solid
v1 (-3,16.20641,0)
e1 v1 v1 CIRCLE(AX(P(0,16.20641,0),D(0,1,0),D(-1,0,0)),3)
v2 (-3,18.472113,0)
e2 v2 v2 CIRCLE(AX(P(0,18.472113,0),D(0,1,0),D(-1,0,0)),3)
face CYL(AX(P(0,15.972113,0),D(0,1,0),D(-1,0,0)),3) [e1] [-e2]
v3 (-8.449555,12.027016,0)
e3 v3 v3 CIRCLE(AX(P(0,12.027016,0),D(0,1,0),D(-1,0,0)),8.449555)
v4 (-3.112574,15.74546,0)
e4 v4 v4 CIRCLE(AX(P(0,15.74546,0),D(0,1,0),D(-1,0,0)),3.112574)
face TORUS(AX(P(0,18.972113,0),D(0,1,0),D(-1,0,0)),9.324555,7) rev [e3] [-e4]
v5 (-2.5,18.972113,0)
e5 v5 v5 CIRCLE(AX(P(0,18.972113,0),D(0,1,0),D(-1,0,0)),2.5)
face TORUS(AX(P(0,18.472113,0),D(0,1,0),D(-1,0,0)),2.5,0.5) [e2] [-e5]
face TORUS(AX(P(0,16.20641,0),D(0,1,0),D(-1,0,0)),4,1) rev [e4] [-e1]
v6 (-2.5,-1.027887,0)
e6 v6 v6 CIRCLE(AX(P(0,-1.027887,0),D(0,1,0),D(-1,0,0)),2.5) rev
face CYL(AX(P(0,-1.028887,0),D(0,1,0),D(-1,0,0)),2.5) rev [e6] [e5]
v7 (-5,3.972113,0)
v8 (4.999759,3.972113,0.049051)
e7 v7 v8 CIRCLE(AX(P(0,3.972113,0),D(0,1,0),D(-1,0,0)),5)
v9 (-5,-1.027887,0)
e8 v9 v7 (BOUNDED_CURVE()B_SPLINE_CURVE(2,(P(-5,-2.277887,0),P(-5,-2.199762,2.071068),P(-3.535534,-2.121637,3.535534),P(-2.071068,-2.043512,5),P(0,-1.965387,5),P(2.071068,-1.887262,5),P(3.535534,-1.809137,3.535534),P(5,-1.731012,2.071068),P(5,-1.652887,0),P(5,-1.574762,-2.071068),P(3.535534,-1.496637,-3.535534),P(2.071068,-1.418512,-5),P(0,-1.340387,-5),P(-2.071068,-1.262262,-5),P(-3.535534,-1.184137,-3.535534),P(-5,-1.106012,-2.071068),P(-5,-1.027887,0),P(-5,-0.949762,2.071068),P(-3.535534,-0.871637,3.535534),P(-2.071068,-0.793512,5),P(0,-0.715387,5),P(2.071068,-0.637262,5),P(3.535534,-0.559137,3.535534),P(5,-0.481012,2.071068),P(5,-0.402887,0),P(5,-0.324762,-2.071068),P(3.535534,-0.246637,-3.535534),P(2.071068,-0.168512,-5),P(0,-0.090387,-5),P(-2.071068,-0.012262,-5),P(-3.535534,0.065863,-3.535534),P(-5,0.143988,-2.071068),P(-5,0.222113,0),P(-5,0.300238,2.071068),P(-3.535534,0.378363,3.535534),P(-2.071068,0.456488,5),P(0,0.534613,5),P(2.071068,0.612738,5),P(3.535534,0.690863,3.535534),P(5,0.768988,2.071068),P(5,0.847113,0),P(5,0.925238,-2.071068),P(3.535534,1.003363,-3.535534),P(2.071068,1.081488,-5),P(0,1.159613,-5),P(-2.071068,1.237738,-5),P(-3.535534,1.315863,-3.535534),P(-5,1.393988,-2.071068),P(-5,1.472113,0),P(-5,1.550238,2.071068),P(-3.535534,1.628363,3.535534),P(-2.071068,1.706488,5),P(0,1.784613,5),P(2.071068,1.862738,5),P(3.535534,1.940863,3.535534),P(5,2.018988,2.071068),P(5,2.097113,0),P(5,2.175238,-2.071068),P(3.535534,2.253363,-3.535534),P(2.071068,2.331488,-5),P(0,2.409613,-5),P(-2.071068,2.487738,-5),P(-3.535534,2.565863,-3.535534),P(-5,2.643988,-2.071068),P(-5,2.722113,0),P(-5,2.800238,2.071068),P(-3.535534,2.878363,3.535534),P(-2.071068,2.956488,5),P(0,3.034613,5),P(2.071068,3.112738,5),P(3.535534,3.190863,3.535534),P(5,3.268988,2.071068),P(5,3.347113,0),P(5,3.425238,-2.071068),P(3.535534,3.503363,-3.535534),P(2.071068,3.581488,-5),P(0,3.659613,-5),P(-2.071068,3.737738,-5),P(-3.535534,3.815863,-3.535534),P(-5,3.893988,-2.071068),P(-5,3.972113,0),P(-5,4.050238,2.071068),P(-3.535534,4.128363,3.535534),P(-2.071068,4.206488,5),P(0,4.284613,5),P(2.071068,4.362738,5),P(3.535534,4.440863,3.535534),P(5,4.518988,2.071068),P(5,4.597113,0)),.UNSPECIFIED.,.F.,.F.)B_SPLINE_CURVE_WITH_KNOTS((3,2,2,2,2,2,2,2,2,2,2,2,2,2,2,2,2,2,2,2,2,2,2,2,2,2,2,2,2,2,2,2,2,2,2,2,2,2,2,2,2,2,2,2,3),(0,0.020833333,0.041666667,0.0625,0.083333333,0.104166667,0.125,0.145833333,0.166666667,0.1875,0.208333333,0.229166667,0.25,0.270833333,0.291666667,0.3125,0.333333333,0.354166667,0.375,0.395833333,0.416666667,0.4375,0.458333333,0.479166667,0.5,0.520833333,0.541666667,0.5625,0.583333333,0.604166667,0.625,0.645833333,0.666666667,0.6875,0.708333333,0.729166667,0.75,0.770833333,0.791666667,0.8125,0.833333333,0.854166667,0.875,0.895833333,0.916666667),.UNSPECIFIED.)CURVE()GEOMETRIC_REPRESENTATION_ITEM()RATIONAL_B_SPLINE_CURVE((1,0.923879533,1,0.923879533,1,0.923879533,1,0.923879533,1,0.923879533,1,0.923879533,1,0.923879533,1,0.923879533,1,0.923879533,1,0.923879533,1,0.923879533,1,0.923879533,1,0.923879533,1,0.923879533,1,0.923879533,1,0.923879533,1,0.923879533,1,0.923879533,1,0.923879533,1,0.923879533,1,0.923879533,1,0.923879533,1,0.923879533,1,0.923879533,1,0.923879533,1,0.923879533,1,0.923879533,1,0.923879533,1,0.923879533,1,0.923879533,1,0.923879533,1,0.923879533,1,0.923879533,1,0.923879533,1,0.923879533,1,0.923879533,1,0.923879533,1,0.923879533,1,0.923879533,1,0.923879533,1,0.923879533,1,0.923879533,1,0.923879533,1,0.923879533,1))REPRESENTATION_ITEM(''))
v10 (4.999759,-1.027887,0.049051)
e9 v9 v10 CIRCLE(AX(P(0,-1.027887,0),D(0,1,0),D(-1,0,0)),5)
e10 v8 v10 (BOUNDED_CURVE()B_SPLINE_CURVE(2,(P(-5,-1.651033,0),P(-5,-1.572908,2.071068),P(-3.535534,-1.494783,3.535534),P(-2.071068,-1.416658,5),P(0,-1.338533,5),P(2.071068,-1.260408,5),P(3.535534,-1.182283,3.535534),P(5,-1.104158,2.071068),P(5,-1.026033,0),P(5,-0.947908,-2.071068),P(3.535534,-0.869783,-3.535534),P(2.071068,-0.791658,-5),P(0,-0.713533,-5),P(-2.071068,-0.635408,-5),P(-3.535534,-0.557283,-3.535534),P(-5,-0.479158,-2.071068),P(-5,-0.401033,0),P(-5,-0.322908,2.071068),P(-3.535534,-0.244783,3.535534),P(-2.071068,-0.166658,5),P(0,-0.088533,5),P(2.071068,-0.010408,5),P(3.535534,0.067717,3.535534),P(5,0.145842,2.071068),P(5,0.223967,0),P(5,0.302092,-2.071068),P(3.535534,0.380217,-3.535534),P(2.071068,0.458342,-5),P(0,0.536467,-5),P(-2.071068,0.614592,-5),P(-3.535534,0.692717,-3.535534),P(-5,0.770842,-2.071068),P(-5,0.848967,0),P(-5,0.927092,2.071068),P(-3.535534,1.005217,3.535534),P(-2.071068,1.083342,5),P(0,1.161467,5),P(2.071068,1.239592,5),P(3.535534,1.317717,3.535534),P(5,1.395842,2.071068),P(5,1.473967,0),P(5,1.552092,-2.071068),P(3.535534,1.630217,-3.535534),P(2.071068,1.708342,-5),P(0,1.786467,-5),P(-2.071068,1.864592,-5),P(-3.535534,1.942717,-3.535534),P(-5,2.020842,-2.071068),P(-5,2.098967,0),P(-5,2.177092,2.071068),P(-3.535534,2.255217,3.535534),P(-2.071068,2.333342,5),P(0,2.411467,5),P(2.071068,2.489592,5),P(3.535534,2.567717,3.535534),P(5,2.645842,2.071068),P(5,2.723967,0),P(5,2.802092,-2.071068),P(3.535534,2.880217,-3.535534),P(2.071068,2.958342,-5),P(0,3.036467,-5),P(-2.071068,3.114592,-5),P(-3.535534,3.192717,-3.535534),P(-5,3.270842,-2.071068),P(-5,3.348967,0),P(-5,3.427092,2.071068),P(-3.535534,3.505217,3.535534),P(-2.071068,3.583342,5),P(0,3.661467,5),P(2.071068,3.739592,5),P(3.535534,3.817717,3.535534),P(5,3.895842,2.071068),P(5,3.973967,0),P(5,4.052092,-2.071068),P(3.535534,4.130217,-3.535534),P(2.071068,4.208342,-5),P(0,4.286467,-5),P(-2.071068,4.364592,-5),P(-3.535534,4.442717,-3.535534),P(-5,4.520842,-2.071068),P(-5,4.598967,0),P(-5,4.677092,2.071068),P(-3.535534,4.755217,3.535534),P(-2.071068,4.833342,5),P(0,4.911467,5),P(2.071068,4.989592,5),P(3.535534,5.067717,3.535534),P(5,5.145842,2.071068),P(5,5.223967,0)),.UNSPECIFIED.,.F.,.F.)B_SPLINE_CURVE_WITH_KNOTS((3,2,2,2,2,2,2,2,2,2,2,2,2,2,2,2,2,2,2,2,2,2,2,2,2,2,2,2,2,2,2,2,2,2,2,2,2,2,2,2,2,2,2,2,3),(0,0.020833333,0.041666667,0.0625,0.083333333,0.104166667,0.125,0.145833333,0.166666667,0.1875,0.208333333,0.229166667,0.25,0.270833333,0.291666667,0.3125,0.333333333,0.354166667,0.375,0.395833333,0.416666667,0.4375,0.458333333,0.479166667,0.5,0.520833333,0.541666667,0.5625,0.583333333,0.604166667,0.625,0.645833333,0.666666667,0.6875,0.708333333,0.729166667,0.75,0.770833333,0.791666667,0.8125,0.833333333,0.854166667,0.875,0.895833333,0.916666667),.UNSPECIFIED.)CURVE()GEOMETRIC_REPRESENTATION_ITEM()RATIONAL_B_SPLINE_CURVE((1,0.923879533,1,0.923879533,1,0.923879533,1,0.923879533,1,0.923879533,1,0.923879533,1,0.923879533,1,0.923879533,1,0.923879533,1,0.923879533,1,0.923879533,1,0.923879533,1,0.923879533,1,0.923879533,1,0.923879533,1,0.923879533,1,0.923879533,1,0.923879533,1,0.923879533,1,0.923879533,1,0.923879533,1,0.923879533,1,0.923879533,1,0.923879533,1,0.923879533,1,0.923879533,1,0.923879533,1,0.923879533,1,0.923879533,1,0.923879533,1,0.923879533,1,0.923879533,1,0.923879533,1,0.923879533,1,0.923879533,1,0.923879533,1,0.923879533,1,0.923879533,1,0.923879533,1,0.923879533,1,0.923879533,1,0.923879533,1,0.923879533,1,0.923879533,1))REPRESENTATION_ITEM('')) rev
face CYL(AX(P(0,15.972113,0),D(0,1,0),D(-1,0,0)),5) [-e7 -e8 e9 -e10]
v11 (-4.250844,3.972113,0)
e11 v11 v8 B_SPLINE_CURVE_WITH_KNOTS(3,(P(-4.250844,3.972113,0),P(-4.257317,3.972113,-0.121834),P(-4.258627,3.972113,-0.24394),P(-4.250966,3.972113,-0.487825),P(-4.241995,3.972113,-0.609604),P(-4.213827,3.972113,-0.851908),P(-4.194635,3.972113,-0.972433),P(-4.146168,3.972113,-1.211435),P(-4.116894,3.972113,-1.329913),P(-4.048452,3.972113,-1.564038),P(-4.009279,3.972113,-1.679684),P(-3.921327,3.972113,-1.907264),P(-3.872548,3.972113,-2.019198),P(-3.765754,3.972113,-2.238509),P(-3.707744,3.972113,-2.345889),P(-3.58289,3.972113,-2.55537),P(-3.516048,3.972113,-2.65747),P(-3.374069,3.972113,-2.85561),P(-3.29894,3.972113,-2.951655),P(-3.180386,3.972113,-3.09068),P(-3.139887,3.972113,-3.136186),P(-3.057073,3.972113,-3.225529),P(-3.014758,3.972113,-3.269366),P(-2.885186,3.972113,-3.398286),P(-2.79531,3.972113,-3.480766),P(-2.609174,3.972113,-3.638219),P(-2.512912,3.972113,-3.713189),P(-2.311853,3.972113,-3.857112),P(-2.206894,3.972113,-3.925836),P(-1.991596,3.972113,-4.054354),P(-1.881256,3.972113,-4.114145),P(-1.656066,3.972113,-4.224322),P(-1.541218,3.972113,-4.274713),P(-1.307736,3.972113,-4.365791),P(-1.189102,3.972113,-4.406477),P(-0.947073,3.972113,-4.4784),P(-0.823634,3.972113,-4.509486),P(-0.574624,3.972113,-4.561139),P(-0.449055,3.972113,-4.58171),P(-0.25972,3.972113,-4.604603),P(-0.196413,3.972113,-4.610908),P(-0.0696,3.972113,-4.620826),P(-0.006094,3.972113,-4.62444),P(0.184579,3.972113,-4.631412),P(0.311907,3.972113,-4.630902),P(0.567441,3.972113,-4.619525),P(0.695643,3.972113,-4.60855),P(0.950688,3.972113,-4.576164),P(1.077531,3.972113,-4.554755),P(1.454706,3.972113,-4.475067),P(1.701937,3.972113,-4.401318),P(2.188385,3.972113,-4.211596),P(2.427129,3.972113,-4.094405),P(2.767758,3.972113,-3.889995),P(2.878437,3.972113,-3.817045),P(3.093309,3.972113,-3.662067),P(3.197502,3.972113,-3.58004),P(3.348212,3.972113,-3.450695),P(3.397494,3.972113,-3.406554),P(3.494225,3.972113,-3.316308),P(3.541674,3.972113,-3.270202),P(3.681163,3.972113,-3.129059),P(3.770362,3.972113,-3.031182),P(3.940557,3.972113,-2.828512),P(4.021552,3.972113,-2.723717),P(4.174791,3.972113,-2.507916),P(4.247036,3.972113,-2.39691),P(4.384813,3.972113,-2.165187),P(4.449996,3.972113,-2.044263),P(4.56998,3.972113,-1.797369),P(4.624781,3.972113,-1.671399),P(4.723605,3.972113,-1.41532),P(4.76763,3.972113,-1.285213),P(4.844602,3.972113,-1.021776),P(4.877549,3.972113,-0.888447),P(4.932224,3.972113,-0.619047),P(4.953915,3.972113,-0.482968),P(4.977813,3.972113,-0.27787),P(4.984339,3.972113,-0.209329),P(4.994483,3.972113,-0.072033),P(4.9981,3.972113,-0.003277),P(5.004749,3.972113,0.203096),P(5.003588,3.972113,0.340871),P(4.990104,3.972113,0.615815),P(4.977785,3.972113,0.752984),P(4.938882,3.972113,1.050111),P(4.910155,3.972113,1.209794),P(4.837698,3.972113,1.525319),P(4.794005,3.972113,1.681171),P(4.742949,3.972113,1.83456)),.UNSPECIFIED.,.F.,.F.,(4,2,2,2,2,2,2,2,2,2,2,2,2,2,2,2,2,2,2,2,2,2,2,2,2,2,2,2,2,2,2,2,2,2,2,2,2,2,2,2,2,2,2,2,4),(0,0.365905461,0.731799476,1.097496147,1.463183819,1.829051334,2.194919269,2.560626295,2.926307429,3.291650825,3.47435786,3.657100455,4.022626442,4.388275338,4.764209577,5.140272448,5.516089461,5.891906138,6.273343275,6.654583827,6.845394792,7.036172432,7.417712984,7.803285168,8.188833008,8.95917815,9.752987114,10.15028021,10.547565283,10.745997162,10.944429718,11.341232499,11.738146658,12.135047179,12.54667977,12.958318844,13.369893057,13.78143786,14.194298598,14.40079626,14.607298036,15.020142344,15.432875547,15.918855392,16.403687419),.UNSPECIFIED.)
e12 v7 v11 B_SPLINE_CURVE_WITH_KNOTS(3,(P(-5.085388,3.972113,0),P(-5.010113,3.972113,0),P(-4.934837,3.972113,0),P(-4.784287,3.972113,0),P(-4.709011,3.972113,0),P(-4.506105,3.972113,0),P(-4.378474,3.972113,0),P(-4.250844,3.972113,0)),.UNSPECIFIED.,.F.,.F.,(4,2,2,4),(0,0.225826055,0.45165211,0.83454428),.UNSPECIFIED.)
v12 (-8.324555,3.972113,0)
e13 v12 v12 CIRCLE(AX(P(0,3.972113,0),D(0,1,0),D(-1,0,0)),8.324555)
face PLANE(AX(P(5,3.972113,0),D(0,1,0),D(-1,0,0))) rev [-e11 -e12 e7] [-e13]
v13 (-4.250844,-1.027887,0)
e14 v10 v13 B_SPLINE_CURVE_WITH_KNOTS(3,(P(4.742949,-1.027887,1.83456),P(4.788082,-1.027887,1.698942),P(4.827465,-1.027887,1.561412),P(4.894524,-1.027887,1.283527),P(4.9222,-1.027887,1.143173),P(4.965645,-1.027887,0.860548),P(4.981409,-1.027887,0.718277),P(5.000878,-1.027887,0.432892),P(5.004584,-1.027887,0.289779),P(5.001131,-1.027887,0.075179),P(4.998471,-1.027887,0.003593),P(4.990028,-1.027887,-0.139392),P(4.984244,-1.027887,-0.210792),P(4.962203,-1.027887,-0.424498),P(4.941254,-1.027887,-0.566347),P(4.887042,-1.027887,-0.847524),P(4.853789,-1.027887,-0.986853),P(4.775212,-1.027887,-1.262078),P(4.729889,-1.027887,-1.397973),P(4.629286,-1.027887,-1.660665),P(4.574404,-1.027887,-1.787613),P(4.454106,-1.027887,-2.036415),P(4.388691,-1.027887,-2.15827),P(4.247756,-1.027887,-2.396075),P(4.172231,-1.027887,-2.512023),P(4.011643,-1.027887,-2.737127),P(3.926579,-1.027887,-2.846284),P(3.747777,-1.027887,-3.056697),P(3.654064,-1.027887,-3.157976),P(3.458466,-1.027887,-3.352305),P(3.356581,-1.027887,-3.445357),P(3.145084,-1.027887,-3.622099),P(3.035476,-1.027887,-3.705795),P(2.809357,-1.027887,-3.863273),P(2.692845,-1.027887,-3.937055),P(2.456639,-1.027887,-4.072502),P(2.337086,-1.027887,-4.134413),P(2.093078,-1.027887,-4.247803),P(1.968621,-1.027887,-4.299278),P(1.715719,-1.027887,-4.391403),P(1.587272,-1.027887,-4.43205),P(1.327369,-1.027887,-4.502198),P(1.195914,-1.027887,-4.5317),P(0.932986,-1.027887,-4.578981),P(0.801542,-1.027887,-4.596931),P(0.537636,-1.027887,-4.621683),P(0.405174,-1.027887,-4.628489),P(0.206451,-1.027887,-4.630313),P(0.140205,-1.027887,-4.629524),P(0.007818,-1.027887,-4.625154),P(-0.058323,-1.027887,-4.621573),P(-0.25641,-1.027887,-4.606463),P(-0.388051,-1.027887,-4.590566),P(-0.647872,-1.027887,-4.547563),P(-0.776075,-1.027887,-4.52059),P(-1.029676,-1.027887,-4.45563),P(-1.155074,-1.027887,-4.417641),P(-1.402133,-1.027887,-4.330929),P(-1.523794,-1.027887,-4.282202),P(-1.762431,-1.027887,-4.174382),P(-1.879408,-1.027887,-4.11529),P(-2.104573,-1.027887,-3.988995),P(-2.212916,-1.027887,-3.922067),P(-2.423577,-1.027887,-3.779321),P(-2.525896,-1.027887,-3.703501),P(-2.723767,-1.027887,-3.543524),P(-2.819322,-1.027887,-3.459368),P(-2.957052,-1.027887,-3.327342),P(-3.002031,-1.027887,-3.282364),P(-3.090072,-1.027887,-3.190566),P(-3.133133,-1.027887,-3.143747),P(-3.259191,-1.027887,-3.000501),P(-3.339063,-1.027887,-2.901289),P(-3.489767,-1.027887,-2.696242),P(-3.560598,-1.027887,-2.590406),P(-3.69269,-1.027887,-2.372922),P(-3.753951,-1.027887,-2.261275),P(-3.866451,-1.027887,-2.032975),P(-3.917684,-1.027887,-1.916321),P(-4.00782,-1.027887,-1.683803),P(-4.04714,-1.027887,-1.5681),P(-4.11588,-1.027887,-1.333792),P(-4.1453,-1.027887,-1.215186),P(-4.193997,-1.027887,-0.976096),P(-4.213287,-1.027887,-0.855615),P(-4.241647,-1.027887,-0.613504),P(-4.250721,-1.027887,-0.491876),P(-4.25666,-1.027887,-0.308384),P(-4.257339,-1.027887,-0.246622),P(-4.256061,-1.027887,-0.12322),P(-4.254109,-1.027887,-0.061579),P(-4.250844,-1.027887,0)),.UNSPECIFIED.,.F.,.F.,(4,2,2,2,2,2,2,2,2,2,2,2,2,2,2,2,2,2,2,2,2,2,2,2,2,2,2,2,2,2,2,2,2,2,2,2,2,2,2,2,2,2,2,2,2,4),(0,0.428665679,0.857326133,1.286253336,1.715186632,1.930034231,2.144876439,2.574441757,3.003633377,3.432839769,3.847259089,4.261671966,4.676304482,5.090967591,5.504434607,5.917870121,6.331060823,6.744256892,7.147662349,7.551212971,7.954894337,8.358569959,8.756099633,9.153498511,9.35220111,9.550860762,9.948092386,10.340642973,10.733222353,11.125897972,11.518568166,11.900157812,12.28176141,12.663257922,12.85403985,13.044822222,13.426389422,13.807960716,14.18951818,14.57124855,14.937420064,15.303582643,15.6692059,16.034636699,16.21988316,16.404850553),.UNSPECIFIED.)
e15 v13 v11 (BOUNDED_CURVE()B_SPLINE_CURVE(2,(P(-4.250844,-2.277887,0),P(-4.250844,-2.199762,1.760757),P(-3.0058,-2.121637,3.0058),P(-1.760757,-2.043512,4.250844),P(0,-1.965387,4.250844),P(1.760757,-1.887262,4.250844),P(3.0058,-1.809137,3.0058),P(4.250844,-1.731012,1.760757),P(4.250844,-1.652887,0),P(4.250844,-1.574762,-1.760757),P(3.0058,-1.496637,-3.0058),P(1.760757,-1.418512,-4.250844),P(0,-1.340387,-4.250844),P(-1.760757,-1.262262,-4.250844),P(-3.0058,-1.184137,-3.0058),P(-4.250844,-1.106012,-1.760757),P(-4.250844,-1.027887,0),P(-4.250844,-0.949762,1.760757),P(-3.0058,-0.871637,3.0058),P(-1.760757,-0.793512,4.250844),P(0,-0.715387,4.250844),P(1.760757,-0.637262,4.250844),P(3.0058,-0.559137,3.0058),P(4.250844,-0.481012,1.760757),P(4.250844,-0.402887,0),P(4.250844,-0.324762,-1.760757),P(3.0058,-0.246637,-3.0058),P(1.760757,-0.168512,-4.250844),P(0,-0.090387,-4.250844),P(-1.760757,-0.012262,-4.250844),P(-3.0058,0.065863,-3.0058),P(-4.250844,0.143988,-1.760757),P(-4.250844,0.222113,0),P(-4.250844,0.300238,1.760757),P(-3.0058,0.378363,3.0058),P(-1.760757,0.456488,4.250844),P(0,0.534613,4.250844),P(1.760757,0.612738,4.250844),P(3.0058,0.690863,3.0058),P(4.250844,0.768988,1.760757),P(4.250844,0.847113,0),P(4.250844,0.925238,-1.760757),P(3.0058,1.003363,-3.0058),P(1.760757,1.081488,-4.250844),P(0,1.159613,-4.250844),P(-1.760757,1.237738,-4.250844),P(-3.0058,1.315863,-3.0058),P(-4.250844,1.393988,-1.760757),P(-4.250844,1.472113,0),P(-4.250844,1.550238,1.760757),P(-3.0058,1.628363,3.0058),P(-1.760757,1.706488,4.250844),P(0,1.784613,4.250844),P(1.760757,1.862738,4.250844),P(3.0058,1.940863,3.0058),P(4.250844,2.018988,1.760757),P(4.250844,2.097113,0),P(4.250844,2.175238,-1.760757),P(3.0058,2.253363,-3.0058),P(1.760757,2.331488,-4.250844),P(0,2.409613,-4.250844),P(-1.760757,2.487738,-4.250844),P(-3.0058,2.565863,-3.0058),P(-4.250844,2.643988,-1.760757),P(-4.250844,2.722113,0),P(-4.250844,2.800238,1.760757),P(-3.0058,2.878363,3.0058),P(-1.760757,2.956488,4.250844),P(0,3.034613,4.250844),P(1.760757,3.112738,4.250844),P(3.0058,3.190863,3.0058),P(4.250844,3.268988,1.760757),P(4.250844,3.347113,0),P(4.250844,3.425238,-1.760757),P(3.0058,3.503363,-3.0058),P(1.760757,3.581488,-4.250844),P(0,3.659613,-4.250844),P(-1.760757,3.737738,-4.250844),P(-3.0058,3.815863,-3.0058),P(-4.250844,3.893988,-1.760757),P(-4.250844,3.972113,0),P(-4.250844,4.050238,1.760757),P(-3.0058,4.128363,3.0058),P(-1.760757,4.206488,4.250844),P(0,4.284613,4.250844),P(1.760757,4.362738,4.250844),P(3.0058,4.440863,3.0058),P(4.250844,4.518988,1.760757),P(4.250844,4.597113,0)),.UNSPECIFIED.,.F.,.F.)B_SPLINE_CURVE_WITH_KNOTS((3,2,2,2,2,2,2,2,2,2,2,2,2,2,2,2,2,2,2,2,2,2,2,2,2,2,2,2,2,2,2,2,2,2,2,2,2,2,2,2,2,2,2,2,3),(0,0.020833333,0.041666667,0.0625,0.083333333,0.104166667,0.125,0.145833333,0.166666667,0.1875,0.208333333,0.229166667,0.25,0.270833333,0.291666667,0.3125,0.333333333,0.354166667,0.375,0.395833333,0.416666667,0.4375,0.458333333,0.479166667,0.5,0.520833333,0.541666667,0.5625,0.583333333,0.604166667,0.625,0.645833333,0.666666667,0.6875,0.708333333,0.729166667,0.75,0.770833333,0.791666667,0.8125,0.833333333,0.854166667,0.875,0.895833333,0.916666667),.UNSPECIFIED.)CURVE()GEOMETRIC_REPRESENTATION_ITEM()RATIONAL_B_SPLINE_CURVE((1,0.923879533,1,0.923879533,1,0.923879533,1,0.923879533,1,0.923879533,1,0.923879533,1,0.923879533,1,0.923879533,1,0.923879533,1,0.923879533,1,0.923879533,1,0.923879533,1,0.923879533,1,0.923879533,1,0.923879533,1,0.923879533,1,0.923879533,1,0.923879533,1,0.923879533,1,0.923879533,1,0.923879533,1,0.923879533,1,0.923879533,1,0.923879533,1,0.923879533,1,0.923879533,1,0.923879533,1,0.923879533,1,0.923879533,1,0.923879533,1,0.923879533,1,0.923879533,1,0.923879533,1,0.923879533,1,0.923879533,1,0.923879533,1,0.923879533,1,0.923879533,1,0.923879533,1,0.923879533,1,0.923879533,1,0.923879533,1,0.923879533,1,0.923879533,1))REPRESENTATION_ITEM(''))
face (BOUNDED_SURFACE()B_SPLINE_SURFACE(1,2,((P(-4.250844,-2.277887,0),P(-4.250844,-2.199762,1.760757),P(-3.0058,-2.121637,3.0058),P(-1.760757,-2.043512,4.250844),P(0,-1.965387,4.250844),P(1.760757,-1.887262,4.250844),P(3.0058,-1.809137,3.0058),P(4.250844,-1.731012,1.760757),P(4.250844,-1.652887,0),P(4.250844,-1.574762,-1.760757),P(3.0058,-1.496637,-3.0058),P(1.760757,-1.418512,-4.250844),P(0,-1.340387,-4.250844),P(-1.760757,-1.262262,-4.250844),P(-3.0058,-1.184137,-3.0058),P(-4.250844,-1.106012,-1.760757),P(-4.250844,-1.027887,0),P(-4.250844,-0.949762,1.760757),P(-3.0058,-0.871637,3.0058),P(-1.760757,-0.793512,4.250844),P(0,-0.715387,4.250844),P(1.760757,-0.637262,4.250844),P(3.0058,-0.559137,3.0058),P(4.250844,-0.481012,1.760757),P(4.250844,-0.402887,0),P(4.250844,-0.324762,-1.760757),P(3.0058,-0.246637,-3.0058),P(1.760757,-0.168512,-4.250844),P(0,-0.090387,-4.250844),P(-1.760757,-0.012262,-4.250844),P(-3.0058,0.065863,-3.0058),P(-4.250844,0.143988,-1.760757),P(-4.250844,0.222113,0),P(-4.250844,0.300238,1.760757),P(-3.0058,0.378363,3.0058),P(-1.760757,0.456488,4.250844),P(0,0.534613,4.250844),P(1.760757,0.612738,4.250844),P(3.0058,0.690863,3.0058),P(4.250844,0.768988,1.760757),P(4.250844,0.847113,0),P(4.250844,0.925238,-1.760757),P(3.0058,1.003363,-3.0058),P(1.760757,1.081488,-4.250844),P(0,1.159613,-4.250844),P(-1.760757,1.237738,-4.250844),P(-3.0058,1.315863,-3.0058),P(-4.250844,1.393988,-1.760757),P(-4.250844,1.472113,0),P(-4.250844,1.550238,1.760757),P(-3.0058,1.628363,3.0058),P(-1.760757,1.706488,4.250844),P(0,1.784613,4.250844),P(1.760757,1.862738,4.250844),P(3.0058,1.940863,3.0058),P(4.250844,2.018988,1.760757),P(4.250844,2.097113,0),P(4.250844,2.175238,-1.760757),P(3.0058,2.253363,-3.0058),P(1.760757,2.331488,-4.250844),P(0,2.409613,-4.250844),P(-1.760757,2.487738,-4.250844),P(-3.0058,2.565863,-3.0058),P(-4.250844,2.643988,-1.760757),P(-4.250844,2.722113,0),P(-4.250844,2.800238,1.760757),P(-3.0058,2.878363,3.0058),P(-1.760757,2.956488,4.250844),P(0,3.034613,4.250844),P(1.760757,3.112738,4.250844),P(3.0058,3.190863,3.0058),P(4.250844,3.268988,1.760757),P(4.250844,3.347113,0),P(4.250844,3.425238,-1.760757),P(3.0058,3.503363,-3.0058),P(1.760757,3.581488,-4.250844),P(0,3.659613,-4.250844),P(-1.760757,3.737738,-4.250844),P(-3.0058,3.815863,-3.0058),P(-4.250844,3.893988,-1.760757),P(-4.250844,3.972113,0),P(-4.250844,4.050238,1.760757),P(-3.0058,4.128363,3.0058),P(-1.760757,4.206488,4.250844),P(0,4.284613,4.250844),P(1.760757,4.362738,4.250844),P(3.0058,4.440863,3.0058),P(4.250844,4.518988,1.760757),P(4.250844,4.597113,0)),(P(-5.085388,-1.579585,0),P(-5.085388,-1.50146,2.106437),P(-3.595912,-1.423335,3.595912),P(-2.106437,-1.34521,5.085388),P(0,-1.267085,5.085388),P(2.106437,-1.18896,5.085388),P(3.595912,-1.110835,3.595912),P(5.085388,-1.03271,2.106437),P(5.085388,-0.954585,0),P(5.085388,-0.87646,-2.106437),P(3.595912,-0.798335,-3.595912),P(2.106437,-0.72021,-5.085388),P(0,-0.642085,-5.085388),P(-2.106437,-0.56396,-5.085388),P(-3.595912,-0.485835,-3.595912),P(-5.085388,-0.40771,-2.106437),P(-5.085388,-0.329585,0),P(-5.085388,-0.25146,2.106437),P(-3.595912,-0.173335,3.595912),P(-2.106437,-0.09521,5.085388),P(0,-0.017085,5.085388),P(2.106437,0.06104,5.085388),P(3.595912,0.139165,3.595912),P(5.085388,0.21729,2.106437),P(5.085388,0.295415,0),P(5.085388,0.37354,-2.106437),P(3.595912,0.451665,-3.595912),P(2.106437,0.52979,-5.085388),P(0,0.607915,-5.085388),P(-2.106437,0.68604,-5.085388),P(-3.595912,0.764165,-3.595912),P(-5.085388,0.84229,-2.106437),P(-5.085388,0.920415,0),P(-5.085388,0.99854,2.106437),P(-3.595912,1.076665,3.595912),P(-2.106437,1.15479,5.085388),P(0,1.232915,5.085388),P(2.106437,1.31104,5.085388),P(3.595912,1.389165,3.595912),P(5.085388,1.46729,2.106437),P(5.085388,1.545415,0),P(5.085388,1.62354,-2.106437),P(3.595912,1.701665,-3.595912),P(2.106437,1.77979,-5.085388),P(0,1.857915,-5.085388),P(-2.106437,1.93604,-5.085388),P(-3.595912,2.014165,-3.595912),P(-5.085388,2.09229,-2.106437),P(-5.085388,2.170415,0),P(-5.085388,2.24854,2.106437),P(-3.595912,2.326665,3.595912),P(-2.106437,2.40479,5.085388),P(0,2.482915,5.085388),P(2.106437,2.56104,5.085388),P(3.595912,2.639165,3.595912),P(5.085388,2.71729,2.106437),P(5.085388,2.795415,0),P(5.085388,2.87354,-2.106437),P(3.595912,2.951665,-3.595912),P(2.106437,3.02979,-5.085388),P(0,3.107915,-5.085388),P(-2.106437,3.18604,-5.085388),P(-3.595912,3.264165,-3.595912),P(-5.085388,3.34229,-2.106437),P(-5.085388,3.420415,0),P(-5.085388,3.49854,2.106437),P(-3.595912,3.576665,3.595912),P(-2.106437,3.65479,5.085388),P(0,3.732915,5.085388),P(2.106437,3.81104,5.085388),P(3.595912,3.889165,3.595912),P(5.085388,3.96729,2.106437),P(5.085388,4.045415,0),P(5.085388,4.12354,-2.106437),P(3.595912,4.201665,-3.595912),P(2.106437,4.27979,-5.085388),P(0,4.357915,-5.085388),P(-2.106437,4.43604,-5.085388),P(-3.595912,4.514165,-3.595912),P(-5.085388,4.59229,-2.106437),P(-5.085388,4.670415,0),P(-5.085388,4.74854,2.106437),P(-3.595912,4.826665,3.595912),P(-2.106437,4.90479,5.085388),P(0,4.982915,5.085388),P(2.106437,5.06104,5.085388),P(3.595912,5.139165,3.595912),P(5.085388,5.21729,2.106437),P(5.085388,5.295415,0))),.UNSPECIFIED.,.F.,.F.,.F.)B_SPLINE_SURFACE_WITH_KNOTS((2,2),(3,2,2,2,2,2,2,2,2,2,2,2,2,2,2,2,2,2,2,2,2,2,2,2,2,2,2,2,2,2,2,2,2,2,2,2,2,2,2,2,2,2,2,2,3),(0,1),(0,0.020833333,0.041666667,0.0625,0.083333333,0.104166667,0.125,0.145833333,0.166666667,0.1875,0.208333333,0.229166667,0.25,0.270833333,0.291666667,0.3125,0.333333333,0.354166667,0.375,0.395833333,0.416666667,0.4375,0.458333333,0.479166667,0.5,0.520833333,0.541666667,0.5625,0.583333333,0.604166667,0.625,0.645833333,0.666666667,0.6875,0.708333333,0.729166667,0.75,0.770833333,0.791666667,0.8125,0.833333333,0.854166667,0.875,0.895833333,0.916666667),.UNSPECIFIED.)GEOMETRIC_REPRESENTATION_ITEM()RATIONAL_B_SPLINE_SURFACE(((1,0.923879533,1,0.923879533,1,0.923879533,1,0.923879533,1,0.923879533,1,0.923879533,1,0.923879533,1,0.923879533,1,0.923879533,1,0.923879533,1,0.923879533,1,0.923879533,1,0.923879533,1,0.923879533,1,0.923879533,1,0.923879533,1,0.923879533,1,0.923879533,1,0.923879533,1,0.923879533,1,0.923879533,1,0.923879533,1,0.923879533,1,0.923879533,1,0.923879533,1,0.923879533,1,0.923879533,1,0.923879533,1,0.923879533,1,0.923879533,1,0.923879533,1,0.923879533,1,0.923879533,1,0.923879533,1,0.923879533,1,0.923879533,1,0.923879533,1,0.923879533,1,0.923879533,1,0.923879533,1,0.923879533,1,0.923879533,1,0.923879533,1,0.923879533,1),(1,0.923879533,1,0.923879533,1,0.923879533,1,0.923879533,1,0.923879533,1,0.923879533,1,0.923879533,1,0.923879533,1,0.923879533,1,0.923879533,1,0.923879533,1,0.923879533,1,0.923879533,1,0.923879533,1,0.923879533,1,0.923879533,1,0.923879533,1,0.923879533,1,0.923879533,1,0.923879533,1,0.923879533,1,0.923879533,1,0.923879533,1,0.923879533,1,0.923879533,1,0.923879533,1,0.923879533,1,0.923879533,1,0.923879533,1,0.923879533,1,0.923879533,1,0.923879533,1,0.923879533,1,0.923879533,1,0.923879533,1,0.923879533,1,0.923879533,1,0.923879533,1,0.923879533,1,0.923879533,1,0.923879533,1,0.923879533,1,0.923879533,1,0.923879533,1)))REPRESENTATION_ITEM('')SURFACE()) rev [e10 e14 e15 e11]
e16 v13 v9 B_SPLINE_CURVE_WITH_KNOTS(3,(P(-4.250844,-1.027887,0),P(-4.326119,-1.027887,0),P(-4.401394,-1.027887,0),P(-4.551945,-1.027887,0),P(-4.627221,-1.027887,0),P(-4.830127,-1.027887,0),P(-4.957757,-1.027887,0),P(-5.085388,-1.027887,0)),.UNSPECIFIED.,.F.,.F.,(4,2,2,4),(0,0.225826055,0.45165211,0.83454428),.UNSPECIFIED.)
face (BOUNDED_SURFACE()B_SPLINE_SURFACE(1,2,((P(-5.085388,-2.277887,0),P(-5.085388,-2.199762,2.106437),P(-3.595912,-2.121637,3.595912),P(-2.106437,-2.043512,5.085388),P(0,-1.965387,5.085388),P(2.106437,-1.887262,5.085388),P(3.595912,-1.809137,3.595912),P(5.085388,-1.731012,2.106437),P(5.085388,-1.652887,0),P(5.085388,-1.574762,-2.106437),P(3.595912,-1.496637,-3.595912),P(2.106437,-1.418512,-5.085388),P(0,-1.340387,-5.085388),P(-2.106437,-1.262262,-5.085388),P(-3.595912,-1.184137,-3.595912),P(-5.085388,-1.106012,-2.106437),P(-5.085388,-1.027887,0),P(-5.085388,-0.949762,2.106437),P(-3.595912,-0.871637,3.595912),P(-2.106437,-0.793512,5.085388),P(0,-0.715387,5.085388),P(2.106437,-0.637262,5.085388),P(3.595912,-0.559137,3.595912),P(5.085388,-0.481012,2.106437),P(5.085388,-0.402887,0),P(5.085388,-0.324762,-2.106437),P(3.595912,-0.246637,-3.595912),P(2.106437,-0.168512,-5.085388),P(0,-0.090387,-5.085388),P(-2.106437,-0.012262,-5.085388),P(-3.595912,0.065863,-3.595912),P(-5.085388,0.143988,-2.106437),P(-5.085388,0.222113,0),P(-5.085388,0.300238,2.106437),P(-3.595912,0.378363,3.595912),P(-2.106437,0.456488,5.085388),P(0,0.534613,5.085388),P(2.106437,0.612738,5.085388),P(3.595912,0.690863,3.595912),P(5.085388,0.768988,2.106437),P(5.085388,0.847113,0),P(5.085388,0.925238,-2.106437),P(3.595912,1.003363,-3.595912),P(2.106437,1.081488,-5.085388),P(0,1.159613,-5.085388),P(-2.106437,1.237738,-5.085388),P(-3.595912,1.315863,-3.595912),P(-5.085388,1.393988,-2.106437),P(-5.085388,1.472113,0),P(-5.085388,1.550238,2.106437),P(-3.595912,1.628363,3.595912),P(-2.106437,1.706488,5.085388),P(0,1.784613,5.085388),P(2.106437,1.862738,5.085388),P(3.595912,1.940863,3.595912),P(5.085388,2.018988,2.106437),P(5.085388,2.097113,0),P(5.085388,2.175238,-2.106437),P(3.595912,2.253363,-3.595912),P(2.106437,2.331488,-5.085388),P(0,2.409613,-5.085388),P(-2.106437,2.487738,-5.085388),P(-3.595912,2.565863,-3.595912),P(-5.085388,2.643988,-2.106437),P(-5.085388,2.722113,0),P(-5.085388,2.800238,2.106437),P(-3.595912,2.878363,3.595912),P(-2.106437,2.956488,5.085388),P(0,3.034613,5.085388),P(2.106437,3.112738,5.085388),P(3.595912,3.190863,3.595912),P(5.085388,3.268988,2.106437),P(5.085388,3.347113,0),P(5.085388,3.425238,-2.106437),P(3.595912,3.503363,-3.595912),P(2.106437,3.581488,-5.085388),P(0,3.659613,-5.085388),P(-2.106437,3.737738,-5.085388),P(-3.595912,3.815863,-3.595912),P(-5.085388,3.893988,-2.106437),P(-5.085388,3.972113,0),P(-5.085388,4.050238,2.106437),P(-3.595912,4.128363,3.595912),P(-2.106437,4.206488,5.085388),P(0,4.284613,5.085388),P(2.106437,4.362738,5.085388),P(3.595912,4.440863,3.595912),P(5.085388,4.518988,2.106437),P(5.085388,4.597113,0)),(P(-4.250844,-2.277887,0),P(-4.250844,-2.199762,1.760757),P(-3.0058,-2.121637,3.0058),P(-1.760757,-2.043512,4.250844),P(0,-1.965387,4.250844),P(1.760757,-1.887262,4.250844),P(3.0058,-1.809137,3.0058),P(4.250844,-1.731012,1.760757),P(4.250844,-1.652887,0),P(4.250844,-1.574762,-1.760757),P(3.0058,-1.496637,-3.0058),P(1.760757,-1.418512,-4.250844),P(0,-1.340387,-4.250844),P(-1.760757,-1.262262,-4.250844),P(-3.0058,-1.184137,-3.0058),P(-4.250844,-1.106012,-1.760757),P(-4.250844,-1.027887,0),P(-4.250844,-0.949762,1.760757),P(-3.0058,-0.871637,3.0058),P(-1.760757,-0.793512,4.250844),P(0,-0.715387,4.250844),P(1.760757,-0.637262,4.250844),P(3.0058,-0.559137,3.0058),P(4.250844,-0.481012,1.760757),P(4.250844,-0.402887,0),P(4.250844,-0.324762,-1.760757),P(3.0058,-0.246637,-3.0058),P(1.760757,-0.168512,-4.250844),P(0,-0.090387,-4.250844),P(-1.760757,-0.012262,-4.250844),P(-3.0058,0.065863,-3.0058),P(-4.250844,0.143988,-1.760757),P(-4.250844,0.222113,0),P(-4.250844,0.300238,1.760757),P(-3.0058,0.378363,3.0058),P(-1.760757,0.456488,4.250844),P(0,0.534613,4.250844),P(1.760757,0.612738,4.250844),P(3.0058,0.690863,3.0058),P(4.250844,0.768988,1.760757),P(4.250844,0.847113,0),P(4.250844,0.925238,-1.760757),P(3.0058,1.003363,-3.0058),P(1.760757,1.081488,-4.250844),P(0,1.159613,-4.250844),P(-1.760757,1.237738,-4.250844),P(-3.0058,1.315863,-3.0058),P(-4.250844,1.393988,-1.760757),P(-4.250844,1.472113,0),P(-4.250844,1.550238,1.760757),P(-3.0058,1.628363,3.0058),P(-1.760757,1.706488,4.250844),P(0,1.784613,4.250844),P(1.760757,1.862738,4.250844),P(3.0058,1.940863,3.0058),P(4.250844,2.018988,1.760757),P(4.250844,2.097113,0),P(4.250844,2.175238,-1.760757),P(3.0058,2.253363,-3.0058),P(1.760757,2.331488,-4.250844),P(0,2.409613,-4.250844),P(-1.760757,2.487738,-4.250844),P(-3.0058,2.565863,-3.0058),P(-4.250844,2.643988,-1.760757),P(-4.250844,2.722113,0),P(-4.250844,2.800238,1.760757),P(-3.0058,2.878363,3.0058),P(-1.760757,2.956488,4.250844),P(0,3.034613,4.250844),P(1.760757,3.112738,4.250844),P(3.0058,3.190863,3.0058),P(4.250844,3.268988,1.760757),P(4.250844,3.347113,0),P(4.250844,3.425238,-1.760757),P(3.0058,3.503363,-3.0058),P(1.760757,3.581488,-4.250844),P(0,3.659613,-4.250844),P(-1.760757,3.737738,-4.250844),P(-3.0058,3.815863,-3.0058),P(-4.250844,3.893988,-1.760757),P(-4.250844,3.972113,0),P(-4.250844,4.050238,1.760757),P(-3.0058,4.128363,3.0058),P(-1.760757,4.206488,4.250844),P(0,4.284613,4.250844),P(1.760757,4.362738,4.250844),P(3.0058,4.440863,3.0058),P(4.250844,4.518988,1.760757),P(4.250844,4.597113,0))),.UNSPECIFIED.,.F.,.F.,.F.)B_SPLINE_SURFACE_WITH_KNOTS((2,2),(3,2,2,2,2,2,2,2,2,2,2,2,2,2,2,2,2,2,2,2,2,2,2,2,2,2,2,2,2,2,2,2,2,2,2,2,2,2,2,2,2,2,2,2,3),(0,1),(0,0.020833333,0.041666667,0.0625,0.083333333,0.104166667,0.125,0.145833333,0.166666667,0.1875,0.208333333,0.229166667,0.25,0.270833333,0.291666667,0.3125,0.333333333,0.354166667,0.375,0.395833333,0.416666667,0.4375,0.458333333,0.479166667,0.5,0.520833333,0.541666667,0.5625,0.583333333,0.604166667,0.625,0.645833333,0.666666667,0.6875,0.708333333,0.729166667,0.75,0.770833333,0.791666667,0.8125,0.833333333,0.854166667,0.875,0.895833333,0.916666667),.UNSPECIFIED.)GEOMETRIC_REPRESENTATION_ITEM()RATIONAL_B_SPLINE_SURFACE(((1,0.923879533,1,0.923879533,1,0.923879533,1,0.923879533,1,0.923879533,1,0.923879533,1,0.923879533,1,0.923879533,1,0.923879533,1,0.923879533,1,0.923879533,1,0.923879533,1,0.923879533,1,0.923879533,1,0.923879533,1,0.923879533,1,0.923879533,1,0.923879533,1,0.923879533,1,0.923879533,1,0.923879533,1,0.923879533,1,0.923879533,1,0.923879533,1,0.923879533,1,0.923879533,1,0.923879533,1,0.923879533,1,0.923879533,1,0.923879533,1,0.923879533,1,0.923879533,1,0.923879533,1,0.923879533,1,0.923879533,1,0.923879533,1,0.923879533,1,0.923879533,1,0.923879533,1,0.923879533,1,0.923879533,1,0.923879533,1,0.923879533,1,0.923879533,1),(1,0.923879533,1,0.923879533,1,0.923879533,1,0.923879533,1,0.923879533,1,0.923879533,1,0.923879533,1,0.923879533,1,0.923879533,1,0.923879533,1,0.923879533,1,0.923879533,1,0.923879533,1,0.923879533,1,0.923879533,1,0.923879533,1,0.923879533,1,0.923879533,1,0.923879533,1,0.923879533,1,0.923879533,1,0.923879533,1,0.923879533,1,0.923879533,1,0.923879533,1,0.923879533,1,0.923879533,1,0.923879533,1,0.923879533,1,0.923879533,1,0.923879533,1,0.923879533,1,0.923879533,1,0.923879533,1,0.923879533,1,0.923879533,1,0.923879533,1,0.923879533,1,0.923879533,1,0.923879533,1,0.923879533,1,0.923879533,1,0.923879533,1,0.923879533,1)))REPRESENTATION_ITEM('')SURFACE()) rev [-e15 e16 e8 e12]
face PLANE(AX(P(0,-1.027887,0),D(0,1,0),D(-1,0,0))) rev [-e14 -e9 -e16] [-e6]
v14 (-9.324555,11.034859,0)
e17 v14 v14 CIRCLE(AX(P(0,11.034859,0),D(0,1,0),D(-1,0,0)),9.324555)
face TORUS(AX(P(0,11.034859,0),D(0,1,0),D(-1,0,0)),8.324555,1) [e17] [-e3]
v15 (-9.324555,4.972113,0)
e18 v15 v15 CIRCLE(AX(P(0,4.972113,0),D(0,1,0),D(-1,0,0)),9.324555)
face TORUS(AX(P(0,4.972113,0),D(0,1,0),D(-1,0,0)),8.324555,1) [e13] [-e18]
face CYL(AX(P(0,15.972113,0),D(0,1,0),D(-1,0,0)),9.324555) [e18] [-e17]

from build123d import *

# Parameters (mm, degrees)
KES_EKSTR_ZYON1_REACH = 25.956
IZIM2_R               = 2.5
KES_S_P_R1_PITCH      = 1.25
KES_S_P_R1_TO         = 5


with BuildPart() as part:
    # Çizim1 → Döndür1 (revolve)
    with BuildSketch(Plane.XY, mode=Mode.PRIVATE) as d_nd_r1_sk:
        with BuildLine():
            Line((0, -1.027887155), (5, -1.027887155))
            Line((5, -1.027887155), (5, 3.972112845))
            Line((5, 3.972112845), (8.32455532, 3.972112845))
            ThreePointArc((8.32455532, 3.972112845), (9.031662102, 4.265006064), (9.32455532, 4.972112845))
            Line((9.32455532, 4.972112845), (9.32455532, 11.034858912))
            ThreePointArc((9.32455532, 11.034858912), (9.07455532, 11.69629674), (8.44955532, 12.027015654))
            ThreePointArc((8.44955532, 12.027015654), (5.322926591, 13.228684643), (3.112574113, 15.745459861))
            ThreePointArc((3.112574113, 15.745459861), (3.028551111, 15.969161353), (3, 16.206410287))
            Line((3, 16.206410287), (3, 18.472112845))
            ThreePointArc((3, 18.472112845), (2.853553391, 18.825666236), (2.5, 18.972112845))
            Line((2.5, 18.972112845), (0, 18.972112845))
            Line((0, 18.972112845), (0, 15.972112845))
            Line((0, 15.972112845), (0, -1.027887155))
        make_face()
    revolve(d_nd_r1_sk.sketch.rotate(Axis((0, 15.972112845, 0), (0, -1, 0)), 180), axis=Axis((0, 15.972112845, 0), (0, -1, 0)))

    # Çizim2 → Kes-Ekstrüzyon1 (cut, up to next)
    with BuildSketch(Plane(origin=(0, 18.972112845, 0), x_dir=(1, 0, 0), z_dir=(0, 1, 0)), mode=Mode.PRIVATE) as kes_ekstr_zyon1_sk1:
        with Locations(Location((0, 0, 0), (0, 0, 180))):
            Circle(IZIM2_R)
    kes_ekstr_zyon1_tool1 = extrude(kes_ekstr_zyon1_sk1.sketch, amount=-KES_EKSTR_ZYON1_REACH, mode=Mode.PRIVATE) & part.part
    add(kes_ekstr_zyon1_tool1.solids().sort_by_distance((0, 18.972113, 0))[0], mode=Mode.SUBTRACT)

    # Kes-Süpür1: arcs per turn and ends read off the stored shape
    # Kes-Süpür1: the profile of Çizim7 screwed along a right-hand helix through 5.5 turns, 8 arcs to a turn; built about Z, then put on its axis
    kes_s_p_r1_z = Axis((0, 0, 0), (0, 0, 1))
    kes_s_p_r1_corners = [(4.250843742, 0, -1.25), (5.085388022, 0, -0.551697778), (5.085388022, 0, -1.25)]
    with BuildLine(mode=Mode.PRIVATE) as kes_s_p_r1_profile:
        Line(kes_s_p_r1_corners[0], kes_s_p_r1_corners[1])
        Line(kes_s_p_r1_corners[1], kes_s_p_r1_corners[2])
        Line(kes_s_p_r1_corners[2], kes_s_p_r1_corners[0])
    kes_s_p_r1_cap = Face(kes_s_p_r1_profile.wire())
    kes_s_p_r1_turn_angles = [0, 22.5, 45, 67.5, 90, 112.5, 135, 157.5, 180, 202.5, 225, 247.5, 270, 292.5, 315, 337.5, 360]
    kes_s_p_r1_turn_weights = [1, 0.9238795325112867, 1, 0.9238795325112867, 1, 0.9238795325112867, 1, 0.9238795325112867, 1, 0.9238795325112867, 1, 0.9238795325112867, 1, 0.9238795325112867, 1, 0.9238795325112867, 1]
    kes_s_p_r1_turn_rails = [Edge.make_bspline([Vector(p[0], p[1], 0).rotate(kes_s_p_r1_z, kes_s_p_r1_turn_angles[k]) / kes_s_p_r1_turn_weights[k] + Vector(0, 0, p[2] + KES_S_P_R1_PITCH * kes_s_p_r1_turn_angles[k] / 360) for k in range(17)], [0, 0, 0, 1, 1, 2, 2, 3, 3, 4, 4, 5, 5, 6, 6, 7, 7, 8, 8, 8], 2, kes_s_p_r1_turn_weights) for p in kes_s_p_r1_corners]
    kes_s_p_r1_turn_sides = [Face.make_surface_from_curves(kes_s_p_r1_turn_rails[p[0]], kes_s_p_r1_turn_rails[p[1]]) for p in [(0, 1), (1, 2), (2, 0)]]
    kes_s_p_r1_last_angles = [1800, 1822.5, 1845, 1867.5, 1890, 1912.5, 1935, 1957.5, 1980]
    kes_s_p_r1_last_weights = [1, 0.9238795325112867, 1, 0.9238795325112867, 1, 0.9238795325112867, 1, 0.9238795325112867, 1]
    kes_s_p_r1_last_rails = [Edge.make_bspline([Vector(p[0], p[1], 0).rotate(kes_s_p_r1_z, kes_s_p_r1_last_angles[k]) / kes_s_p_r1_last_weights[k] + Vector(0, 0, p[2] + KES_S_P_R1_PITCH * kes_s_p_r1_last_angles[k] / 360) for k in range(9)], [0, 0, 0, 1, 1, 2, 2, 3, 3, 4, 4, 4], 2, kes_s_p_r1_last_weights) for p in kes_s_p_r1_corners]
    kes_s_p_r1_last_sides = [Face.make_surface_from_curves(kes_s_p_r1_last_rails[p[0]], kes_s_p_r1_last_rails[p[1]]) for p in [(0, 1), (1, 2), (2, 0)]]
    kes_s_p_r1 = Plane(origin=(0, -1.027887155, 0), x_dir=(-1, 0, 0), z_dir=(0, 1, 0)) * split(Solid(Shell([*[p.moved(Location((0, 0, KES_S_P_R1_PITCH * i))) for i in range(5) for p in kes_s_p_r1_turn_sides], *kes_s_p_r1_last_sides, kes_s_p_r1_cap, kes_s_p_r1_cap.rotate(kes_s_p_r1_z, 1980).moved(Location((0, 0, KES_S_P_R1_PITCH * 1980 / 360)))])), bisect_by=Plane.XY.offset(KES_S_P_R1_TO), keep=Keep.BOTTOM, mode=Mode.PRIVATE)
    add(kes_s_p_r1, mode=Mode.SUBTRACT)


solid = part.part
